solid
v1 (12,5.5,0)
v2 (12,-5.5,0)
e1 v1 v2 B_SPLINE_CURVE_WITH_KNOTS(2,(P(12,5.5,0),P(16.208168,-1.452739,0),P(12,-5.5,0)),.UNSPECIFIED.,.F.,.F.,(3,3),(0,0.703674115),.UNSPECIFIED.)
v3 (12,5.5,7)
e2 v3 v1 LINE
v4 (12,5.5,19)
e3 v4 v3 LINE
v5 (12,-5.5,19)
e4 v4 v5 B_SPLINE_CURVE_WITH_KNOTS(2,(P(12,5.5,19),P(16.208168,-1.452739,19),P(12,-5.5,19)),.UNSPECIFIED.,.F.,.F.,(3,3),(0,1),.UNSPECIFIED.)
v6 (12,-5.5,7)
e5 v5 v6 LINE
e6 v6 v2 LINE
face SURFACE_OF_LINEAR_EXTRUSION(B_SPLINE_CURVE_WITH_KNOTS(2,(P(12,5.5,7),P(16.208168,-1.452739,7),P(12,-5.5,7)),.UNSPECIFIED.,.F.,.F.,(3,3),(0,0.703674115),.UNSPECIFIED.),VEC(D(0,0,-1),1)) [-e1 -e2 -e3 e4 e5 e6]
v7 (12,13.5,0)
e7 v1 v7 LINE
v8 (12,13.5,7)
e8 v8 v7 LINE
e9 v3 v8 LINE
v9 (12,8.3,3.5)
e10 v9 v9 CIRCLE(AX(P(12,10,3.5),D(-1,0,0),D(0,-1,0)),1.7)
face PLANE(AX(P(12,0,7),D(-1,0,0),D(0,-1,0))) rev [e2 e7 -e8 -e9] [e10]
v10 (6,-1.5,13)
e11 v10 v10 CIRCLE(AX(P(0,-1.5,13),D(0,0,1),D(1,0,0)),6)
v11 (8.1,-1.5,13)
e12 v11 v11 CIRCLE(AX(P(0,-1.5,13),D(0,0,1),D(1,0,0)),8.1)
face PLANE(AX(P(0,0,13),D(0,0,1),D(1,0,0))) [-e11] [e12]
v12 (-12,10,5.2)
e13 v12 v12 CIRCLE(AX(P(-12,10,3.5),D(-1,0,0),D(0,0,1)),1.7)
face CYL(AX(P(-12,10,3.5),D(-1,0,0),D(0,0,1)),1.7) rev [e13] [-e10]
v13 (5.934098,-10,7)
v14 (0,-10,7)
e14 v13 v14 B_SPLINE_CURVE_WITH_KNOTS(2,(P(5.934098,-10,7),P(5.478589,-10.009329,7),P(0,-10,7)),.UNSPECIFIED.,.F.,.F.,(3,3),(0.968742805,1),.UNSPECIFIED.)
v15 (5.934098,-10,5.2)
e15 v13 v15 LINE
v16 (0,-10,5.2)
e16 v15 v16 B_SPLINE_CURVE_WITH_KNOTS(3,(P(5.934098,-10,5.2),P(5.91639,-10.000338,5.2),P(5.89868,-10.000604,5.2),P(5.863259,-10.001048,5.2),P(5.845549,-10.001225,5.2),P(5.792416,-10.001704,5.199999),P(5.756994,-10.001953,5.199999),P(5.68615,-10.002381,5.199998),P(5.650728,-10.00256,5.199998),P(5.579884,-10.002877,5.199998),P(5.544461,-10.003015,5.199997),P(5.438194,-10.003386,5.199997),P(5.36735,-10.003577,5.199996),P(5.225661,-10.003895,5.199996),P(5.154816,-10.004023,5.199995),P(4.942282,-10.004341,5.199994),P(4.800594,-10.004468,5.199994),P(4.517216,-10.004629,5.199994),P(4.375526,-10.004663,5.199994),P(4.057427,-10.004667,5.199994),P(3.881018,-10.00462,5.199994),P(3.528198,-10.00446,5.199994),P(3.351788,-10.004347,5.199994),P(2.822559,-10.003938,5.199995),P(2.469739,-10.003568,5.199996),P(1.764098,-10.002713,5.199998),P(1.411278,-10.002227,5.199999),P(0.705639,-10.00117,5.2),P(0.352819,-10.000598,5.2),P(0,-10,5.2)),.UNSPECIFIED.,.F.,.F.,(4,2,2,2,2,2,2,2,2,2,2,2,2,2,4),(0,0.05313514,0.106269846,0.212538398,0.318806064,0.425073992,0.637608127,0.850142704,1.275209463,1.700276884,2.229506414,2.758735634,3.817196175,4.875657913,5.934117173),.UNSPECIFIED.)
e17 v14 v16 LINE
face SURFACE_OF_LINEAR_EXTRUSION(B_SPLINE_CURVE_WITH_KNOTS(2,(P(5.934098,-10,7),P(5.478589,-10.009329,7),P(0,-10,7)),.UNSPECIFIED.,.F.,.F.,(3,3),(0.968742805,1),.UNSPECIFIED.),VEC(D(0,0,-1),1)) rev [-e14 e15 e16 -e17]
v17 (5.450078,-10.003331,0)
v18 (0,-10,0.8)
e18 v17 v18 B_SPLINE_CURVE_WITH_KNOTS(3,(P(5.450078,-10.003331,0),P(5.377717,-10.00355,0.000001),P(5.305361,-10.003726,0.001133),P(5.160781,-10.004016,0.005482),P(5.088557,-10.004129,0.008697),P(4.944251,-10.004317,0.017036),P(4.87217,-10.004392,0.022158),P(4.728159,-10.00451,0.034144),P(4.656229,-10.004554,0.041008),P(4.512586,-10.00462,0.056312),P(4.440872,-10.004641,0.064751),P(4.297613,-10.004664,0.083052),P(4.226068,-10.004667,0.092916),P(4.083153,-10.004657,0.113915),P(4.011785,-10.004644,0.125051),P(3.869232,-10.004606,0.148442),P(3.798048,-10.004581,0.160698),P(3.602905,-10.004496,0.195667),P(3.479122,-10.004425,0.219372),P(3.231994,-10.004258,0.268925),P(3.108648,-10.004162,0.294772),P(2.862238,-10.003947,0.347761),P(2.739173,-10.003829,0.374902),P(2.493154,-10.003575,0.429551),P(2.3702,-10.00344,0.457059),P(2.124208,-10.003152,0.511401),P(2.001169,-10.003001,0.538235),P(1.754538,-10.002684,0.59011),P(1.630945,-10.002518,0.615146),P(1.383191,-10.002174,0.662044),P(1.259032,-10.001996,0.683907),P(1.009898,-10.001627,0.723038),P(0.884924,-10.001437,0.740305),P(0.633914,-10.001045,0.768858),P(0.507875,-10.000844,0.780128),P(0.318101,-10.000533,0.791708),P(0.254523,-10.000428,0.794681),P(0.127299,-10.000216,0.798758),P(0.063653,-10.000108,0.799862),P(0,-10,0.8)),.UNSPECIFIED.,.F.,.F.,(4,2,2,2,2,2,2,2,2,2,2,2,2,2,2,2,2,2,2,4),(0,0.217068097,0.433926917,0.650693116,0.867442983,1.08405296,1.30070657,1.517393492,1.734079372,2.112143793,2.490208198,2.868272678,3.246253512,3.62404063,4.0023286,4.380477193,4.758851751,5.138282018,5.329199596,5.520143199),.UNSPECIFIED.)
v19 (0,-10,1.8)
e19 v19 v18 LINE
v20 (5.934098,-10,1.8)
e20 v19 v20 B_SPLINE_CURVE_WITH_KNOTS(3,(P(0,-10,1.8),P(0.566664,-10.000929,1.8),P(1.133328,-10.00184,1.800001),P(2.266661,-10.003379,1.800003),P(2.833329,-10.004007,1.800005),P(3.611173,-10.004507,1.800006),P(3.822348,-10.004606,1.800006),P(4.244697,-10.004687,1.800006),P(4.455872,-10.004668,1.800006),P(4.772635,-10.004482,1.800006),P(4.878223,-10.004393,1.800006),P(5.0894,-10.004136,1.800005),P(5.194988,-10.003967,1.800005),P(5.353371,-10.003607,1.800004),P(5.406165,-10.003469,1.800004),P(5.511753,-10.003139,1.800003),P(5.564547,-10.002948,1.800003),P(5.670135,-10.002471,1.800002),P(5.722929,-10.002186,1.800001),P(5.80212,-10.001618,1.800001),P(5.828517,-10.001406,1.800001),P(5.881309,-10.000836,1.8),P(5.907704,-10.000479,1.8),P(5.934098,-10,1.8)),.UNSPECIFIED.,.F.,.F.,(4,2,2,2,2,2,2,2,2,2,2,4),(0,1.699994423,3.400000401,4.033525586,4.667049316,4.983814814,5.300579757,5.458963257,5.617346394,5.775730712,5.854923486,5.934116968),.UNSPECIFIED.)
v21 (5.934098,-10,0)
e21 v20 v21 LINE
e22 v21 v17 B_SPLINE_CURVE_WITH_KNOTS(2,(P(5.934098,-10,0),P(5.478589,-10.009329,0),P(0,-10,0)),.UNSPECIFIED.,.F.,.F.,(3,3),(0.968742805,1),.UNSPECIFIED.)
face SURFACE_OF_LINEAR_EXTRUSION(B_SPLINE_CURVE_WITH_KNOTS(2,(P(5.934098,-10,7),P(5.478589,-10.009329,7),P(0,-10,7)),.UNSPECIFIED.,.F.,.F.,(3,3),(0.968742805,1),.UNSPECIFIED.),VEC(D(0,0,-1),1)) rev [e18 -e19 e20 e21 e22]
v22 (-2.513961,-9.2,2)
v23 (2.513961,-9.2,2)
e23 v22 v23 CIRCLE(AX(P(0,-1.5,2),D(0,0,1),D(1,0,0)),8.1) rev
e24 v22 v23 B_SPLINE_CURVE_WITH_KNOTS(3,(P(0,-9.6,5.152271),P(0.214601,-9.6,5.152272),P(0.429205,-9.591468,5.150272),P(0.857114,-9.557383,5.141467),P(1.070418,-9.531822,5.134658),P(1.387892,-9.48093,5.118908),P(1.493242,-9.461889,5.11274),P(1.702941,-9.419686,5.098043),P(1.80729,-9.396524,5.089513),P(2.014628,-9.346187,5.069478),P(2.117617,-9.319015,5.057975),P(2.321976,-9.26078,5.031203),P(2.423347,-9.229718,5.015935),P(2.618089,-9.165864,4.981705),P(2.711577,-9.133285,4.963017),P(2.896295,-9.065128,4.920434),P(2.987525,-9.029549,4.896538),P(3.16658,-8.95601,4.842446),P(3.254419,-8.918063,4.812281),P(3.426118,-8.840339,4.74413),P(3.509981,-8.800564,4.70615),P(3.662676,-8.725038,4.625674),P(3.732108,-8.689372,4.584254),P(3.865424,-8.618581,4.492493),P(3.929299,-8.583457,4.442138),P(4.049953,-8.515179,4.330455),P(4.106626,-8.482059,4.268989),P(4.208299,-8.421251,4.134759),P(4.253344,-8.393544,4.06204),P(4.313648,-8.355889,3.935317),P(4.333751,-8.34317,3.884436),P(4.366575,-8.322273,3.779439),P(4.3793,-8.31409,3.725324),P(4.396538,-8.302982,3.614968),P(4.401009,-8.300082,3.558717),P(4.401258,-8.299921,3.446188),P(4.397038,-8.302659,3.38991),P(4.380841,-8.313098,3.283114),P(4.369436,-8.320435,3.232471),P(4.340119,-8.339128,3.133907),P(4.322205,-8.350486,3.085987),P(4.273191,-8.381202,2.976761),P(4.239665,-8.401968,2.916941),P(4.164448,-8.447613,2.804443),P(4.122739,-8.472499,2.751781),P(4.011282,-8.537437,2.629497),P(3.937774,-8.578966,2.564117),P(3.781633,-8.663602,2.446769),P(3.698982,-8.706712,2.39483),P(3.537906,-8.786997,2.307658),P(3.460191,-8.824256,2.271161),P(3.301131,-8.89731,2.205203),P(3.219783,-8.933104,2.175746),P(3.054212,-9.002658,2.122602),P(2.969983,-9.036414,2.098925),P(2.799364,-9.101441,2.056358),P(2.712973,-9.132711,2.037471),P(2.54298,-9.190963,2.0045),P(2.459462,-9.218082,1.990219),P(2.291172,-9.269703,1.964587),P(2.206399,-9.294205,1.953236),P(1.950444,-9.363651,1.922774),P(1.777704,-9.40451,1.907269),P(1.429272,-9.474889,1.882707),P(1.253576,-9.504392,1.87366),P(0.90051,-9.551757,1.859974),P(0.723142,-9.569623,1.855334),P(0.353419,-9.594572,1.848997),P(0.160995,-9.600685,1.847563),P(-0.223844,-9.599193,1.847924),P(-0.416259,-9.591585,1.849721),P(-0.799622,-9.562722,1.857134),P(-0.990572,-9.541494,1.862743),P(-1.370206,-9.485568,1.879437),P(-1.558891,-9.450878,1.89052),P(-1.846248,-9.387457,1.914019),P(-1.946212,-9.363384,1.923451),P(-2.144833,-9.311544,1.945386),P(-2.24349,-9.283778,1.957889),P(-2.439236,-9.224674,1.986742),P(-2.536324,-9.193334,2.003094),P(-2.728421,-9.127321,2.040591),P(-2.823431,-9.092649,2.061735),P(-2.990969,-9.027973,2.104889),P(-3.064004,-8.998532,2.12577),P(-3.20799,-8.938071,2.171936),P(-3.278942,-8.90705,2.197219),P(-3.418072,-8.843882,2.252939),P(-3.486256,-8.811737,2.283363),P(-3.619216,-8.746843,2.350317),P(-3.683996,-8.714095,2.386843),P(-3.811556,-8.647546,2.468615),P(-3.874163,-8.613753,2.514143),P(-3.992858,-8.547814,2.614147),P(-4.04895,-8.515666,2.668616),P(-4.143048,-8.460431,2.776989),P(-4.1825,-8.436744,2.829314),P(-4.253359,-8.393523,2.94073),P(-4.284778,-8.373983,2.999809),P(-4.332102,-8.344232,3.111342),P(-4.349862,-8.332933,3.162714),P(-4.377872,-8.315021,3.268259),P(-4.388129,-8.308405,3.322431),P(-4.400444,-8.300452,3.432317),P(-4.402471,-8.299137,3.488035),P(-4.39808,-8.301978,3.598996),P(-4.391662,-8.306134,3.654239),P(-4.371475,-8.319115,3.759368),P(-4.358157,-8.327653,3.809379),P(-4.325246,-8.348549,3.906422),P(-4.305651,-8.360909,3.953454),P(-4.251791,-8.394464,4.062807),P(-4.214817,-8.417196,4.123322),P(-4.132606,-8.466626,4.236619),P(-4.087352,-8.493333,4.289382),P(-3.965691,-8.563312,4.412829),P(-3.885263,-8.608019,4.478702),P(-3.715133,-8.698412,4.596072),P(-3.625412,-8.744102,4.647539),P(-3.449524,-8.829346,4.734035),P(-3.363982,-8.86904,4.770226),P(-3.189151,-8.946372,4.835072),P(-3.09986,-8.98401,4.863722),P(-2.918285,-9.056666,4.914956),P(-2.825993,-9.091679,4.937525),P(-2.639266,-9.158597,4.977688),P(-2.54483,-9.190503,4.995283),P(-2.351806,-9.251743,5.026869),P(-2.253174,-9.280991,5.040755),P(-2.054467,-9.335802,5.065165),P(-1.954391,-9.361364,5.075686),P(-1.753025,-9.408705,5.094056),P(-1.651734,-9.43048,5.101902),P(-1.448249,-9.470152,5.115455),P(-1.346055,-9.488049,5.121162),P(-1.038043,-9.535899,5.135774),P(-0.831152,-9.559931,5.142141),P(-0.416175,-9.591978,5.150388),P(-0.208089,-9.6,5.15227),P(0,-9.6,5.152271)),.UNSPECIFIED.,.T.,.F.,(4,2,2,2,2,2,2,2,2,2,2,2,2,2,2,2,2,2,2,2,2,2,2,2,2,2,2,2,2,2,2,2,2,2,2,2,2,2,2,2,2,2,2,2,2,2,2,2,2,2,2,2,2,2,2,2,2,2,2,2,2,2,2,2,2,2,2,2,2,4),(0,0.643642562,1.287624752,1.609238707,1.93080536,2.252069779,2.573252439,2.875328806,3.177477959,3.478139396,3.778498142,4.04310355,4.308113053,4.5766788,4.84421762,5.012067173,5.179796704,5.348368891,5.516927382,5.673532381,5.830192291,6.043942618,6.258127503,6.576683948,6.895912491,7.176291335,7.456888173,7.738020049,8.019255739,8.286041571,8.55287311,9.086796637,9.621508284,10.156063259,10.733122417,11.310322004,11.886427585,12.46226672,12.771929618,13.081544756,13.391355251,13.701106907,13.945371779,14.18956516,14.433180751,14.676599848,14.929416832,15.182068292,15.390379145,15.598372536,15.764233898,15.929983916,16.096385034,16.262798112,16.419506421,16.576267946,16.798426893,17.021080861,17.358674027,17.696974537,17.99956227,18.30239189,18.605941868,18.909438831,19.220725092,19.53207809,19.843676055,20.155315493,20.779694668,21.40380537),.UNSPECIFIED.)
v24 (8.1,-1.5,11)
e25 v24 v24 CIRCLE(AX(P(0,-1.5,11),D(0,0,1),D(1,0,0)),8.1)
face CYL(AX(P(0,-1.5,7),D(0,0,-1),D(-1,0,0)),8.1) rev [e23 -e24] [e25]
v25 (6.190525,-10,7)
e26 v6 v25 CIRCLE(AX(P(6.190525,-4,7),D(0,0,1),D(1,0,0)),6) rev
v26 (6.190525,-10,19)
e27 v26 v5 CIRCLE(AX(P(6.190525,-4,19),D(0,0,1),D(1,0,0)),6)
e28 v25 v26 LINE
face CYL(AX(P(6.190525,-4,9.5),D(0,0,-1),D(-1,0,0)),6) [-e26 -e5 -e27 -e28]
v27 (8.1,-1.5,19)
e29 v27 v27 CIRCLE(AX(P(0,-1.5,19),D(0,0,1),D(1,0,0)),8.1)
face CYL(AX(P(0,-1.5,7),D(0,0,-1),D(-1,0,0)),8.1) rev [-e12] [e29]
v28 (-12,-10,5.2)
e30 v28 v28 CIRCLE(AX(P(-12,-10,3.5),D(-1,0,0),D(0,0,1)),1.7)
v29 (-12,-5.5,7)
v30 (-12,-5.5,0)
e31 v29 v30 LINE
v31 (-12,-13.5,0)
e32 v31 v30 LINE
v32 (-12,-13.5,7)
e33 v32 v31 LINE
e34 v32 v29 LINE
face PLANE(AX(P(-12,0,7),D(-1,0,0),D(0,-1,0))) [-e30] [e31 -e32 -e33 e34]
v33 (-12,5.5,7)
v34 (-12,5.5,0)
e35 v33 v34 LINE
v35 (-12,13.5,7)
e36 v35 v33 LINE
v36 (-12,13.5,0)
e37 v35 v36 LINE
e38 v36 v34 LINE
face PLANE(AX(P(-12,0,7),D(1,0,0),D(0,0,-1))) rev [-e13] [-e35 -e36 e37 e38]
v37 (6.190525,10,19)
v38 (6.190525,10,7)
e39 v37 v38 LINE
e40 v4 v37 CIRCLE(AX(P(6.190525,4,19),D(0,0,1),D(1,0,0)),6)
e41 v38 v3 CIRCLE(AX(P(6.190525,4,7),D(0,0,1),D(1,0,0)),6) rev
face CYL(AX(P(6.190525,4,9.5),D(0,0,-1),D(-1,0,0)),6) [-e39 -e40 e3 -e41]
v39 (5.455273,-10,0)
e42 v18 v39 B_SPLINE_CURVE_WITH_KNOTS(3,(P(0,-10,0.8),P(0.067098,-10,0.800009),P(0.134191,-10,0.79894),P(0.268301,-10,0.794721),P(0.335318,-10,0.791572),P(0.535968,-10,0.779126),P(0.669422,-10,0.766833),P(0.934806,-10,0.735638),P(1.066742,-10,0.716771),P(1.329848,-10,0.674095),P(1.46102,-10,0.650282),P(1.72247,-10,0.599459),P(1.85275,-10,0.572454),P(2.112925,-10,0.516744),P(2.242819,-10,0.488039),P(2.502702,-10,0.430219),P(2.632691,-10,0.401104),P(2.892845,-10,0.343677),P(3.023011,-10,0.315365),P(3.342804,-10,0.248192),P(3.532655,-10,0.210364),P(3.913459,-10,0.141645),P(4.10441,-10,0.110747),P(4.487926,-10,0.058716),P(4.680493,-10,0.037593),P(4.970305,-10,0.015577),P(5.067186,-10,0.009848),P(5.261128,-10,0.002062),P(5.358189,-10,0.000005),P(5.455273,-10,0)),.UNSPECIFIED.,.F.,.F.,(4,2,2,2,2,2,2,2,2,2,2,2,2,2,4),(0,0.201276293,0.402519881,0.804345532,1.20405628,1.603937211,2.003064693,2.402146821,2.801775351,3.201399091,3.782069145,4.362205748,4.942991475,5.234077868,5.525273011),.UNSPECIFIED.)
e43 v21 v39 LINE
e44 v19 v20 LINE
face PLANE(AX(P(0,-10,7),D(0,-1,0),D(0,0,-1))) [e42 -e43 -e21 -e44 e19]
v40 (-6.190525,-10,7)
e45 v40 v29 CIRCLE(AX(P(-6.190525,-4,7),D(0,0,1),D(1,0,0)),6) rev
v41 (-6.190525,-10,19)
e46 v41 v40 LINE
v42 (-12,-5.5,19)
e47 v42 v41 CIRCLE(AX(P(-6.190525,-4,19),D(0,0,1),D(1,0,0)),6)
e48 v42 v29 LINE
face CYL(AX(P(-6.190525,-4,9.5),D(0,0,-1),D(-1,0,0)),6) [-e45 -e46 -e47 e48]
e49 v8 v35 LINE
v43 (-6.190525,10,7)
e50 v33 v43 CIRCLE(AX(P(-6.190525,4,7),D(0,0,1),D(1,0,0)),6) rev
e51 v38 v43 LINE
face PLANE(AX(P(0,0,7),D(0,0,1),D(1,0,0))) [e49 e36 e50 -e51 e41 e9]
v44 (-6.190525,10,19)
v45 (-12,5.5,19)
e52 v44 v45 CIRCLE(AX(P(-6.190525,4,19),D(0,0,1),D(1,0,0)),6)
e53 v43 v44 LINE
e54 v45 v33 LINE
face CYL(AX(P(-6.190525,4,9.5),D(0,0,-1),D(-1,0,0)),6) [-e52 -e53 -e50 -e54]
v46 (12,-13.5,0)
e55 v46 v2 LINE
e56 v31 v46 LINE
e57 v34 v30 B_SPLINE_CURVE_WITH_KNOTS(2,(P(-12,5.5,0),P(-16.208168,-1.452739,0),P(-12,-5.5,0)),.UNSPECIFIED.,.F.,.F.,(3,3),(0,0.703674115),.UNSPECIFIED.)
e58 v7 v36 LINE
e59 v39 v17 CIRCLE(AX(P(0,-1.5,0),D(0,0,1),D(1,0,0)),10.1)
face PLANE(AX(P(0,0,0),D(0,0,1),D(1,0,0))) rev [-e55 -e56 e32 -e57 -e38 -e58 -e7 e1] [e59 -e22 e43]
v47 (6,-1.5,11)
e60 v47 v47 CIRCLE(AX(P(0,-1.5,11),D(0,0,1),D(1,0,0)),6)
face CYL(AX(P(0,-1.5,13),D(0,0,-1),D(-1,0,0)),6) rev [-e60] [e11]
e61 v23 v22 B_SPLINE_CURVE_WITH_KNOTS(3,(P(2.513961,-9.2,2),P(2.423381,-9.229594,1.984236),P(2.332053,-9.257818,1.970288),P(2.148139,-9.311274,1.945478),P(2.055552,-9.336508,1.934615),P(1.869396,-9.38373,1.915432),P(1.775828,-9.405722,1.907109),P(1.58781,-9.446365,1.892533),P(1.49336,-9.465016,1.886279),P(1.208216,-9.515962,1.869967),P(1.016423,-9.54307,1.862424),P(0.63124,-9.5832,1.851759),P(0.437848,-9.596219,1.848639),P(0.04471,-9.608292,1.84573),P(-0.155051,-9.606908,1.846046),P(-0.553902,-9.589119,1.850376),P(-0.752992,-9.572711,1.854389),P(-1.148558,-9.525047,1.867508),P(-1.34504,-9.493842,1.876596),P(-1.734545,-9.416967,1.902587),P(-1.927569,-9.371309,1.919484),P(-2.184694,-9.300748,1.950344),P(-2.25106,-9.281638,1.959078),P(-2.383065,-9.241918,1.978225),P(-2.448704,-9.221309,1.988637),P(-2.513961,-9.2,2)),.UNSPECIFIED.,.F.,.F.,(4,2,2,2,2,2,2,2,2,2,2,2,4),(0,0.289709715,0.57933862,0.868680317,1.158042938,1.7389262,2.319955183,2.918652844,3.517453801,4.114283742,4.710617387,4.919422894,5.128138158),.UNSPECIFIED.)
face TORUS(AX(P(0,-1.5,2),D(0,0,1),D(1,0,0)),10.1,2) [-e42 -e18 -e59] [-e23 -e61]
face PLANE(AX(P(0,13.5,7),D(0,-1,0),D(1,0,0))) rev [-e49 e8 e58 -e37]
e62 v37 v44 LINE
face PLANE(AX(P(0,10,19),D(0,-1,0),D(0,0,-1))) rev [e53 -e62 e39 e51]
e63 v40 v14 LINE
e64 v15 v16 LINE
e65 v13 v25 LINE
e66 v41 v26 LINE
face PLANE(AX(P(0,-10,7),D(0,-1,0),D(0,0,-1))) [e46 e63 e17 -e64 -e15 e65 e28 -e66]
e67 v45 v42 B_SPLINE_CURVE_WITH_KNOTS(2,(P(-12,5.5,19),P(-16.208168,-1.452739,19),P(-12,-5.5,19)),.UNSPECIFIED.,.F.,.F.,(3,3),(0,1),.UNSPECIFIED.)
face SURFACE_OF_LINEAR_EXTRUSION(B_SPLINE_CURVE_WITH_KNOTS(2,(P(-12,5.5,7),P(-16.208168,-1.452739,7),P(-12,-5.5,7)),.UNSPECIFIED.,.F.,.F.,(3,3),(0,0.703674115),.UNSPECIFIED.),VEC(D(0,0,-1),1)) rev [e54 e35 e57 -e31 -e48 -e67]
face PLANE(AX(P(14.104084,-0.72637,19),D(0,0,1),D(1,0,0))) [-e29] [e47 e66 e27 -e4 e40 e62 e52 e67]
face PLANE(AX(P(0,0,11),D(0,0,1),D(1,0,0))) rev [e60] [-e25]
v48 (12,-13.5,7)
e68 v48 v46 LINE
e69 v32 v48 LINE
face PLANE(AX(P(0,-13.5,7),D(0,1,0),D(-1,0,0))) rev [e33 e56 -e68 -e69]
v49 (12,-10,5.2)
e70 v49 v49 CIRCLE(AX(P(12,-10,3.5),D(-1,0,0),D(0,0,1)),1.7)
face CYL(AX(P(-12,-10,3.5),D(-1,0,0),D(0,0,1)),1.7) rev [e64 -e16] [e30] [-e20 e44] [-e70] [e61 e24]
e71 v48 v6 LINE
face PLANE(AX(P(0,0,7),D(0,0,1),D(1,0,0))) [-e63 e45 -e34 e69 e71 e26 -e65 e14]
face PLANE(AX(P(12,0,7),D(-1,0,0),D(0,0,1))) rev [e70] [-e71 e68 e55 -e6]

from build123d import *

# Parameters (mm, degrees)
SKETCH1_W            = 24
SKETCH1_H            = 3.5
SKETCH1_R            = 8.1
BOSS_EXTRUDE1_DEPTH  = 7
BOSS_EXTRUDE2_START  = 7
SKETCH1_3_R          = 8.1
BOSS_EXTRUDE2_DEPTH  = 12
M3_CLEARANCE_HOLE1_D = 3.4
FILLET1_R            = 6
BOSS_EXTRUDE3_START  = 11
SKETCH1_4_R          = 8.1
SKETCH1_4_R_2        = 6
BOSS_EXTRUDE3_DEPTH  = 2


with BuildPart() as part:
    # Sketch1 → Boss-Extrude1 (new body)
    # profile 1 of 5: a face of its own
    with BuildSketch(Plane.XY):
        with Locations((0, 11.75)):
            Rectangle(SKETCH1_W, SKETCH1_H)
    # profile 2 of 5: a face of its own
    with BuildSketch(Plane.XY):
        with BuildLine():
            Line((-10, 10), (-12, 10))
            Line((-12, 10), (-12, 5.5))
            add(Edge.make_bspline(
                [(-12, 5.5), (-16.208168435, -1.452739177), (-12, -5.5)],
                knots=[0, 0, 0, 0.703674115, 0.703674115, 0.703674115], degree=2))
            Line((-12, -5.5), (-12, -10))
            Line((-12, -10), (-10, -10))
            Line((-10, -10), (-10, -5.5))
            add(Edge.make_bspline(
                [(-10, 5.5), (-13.144989471, -1.593519523), (-10, -5.5)],
                knots=[0, 0, 0, 0.703674115, 0.703674115, 0.703674115], degree=2))
            Line((-10, 5.5), (-10, 10))
        make_face()
    # profile 3 of 5: a face of its own
    with BuildSketch(Plane.XY):
        with BuildLine():
            Line((12, 5.5), (12, 10))
            Line((12, 10), (10, 10))
            Line((10, 10), (10, 5.5))
            add(Edge.make_bspline(
                [(10, 5.5), (13.144989471, -1.593519523), (10, -5.5)],
                knots=[0, 0, 0, 0.703674115, 0.703674115, 0.703674115], degree=2))
            Line((10, -5.5), (10, -10))
            Line((10, -10), (12, -10))
            Line((12, -10), (12, -5.5))
            add(Edge.make_bspline(
                [(12, 5.5), (16.208168435, -1.452739177), (12, -5.5)],
                knots=[0, 0, 0, 0.703674115, 0.703674115, 0.703674115], degree=2))
        make_face()
    # profile 4 of 5: a face of its own
    with BuildSketch(Plane.XY):
        with BuildLine():
            Line((-10, -10), (-12, -10))
            Line((-12, -10), (-12, -13.5))
            Line((-12, -13.5), (12, -13.5))
            Line((12, -13.5), (12, -10))
            Line((12, -10), (10, -10))
            Line((10, -10), (5.934098246, -10))
            add(Edge.make_bspline(
                [(5.934098246, -10), (5.478588927, -10.00932896), (0, -10)],
                knots=[0.968742805, 0.968742805, 0.968742805, 1, 1, 1], degree=2))
            Line((0, -10), (-10, -10))
        make_face()
    # profile 5 of 5: a face of its own
    with BuildSketch(Plane.XY):
        with BuildLine():
            Line((10, 10), (-10, 10))
            Line((-10, 10), (-10, 5.5))
            add(Edge.make_bspline(
                [(-10, 5.5), (-13.144989471, -1.593519523), (-10, -5.5)],
                knots=[0, 0, 0, 0.703674115, 0.703674115, 0.703674115], degree=2))
            Line((-10, -5.5), (-10, -10))
            Line((-10, -10), (0, -10))
            Line((0, -10), (5.934098246, -10))
            Line((5.934098246, -10), (10, -10))
            Line((10, -10), (10, -5.5))
            add(Edge.make_bspline(
                [(10, 5.5), (13.144989471, -1.593519523), (10, -5.5)],
                knots=[0, 0, 0, 0.703674115, 0.703674115, 0.703674115], degree=2))
            Line((10, 5.5), (10, 10))
        make_face()
        with Locations((0, -1.5)):
            Circle(SKETCH1_R, mode=Mode.SUBTRACT)
    extrude(amount=BOSS_EXTRUDE1_DEPTH)

    # Sketch1<3> → Boss-Extrude2 (add)
    with BuildSketch(Plane.XY.offset(BOSS_EXTRUDE2_START)):
        with BuildLine():
            Line((-12, 10), (-12, 5.5))
            add(Edge.make_bspline(
                [(-12, 5.5), (-16.208168435, -1.452739177), (-12, -5.5)],
                knots=[0, 0, 0, 0.703674115, 0.703674115, 0.703674115], degree=2))
            Line((-12, -5.5), (-12, -10))
            Line((-12, -10), (12, -10))
            Line((12, -10), (12, -5.5))
            add(Edge.make_bspline(
                [(12, 5.5), (16.208168435, -1.452739177), (12, -5.5)],
                knots=[0, 0, 0, 0.703674115, 0.703674115, 0.703674115], degree=2))
            Line((12, 5.5), (12, 10))
            Line((12, 10), (-12, 10))
        make_face()
        with Locations((0, -1.5)):
            Circle(SKETCH1_3_R, mode=Mode.SUBTRACT)
    extrude(amount=BOSS_EXTRUDE2_DEPTH)

    # M3 Clearance Hole1 (through all)
    with Locations(Plane.ZY.offset(12)):
        with Locations((3.5, 10), (3.5, -10)):
            Hole(M3_CLEARANCE_HOLE1_D / 2)

    # Fillet1
    # the kernel refuses this fillet: 6 mm, written as the material it takes off along each edge
    with BuildSketch(Plane(origin=(-12, 10, 7), x_dir=(1, 0, 0), z_dir=(0, 0, 1))) as fillet1_piece_1:
        with BuildLine():
            CenterArc((5.809475019, -6), FILLET1_R, 90, 75.522487814)
            Line((0, -4.5), (0, 0))
            Line((0, 0), (5.809475019, 0))
        make_face()
    extrude(amount=26.523687548, mode=Mode.SUBTRACT)
    with BuildSketch(Plane(origin=(12, 10, 7), x_dir=(0, -1, 0), z_dir=(0, 0, 1)), Plane(origin=(-12, -10, 7), x_dir=(0, 1, 0), z_dir=(0, 0, 1))) as fillet1_piece_2:
        with BuildLine():
            CenterArc((6, -5.809475019), FILLET1_R, 104.477512186, 75.522487814)
            Line((0, -5.809475019), (0, 0))
            Line((0, 0), (4.5, 0))
        make_face()
    extrude(amount=26.523687548, mode=Mode.SUBTRACT)
    with BuildSketch(Plane(origin=(12, -10, 7), x_dir=(0, 1, 0), z_dir=(0, 0, 1))) as fillet1_piece_3:
        with BuildLine():
            CenterArc((6, 5.809475019), FILLET1_R, 180, 75.522487814)
            Line((0, 5.809475019), (0, 0))
            Line((0, 0), (4.5, 0))
        make_face()
    extrude(amount=26.523687548, mode=Mode.SUBTRACT)

    # Sketch1<4> → Boss-Extrude3 (add)
    with BuildSketch(Plane.XY.offset(BOSS_EXTRUDE3_START)):
        with Locations((0, -1.5)):
            Circle(SKETCH1_4_R)
        with Locations((0, -1.5)):
            Circle(SKETCH1_4_R_2, mode=Mode.SUBTRACT)
    extrude(amount=BOSS_EXTRUDE3_DEPTH)

    # Fillet2: read off the stored shape, not the designer's step
    # Fillet2 outline → Fillet2 (revolve, cut)
    with BuildSketch(Plane.XZ.offset(1.5)):
        with BuildLine():
            ThreePointArc((10.1, 0), (8.685786438, 0.585786438), (8.1, 2))
            Line((8.1, 2), (8.1, 0))
            Line((8.1, 0), (10.1, 0))
        make_face()
    revolve(axis=Axis((0, -1.5, 0), (0, 0, 1)), mode=Mode.SUBTRACT)


solid = part.part
